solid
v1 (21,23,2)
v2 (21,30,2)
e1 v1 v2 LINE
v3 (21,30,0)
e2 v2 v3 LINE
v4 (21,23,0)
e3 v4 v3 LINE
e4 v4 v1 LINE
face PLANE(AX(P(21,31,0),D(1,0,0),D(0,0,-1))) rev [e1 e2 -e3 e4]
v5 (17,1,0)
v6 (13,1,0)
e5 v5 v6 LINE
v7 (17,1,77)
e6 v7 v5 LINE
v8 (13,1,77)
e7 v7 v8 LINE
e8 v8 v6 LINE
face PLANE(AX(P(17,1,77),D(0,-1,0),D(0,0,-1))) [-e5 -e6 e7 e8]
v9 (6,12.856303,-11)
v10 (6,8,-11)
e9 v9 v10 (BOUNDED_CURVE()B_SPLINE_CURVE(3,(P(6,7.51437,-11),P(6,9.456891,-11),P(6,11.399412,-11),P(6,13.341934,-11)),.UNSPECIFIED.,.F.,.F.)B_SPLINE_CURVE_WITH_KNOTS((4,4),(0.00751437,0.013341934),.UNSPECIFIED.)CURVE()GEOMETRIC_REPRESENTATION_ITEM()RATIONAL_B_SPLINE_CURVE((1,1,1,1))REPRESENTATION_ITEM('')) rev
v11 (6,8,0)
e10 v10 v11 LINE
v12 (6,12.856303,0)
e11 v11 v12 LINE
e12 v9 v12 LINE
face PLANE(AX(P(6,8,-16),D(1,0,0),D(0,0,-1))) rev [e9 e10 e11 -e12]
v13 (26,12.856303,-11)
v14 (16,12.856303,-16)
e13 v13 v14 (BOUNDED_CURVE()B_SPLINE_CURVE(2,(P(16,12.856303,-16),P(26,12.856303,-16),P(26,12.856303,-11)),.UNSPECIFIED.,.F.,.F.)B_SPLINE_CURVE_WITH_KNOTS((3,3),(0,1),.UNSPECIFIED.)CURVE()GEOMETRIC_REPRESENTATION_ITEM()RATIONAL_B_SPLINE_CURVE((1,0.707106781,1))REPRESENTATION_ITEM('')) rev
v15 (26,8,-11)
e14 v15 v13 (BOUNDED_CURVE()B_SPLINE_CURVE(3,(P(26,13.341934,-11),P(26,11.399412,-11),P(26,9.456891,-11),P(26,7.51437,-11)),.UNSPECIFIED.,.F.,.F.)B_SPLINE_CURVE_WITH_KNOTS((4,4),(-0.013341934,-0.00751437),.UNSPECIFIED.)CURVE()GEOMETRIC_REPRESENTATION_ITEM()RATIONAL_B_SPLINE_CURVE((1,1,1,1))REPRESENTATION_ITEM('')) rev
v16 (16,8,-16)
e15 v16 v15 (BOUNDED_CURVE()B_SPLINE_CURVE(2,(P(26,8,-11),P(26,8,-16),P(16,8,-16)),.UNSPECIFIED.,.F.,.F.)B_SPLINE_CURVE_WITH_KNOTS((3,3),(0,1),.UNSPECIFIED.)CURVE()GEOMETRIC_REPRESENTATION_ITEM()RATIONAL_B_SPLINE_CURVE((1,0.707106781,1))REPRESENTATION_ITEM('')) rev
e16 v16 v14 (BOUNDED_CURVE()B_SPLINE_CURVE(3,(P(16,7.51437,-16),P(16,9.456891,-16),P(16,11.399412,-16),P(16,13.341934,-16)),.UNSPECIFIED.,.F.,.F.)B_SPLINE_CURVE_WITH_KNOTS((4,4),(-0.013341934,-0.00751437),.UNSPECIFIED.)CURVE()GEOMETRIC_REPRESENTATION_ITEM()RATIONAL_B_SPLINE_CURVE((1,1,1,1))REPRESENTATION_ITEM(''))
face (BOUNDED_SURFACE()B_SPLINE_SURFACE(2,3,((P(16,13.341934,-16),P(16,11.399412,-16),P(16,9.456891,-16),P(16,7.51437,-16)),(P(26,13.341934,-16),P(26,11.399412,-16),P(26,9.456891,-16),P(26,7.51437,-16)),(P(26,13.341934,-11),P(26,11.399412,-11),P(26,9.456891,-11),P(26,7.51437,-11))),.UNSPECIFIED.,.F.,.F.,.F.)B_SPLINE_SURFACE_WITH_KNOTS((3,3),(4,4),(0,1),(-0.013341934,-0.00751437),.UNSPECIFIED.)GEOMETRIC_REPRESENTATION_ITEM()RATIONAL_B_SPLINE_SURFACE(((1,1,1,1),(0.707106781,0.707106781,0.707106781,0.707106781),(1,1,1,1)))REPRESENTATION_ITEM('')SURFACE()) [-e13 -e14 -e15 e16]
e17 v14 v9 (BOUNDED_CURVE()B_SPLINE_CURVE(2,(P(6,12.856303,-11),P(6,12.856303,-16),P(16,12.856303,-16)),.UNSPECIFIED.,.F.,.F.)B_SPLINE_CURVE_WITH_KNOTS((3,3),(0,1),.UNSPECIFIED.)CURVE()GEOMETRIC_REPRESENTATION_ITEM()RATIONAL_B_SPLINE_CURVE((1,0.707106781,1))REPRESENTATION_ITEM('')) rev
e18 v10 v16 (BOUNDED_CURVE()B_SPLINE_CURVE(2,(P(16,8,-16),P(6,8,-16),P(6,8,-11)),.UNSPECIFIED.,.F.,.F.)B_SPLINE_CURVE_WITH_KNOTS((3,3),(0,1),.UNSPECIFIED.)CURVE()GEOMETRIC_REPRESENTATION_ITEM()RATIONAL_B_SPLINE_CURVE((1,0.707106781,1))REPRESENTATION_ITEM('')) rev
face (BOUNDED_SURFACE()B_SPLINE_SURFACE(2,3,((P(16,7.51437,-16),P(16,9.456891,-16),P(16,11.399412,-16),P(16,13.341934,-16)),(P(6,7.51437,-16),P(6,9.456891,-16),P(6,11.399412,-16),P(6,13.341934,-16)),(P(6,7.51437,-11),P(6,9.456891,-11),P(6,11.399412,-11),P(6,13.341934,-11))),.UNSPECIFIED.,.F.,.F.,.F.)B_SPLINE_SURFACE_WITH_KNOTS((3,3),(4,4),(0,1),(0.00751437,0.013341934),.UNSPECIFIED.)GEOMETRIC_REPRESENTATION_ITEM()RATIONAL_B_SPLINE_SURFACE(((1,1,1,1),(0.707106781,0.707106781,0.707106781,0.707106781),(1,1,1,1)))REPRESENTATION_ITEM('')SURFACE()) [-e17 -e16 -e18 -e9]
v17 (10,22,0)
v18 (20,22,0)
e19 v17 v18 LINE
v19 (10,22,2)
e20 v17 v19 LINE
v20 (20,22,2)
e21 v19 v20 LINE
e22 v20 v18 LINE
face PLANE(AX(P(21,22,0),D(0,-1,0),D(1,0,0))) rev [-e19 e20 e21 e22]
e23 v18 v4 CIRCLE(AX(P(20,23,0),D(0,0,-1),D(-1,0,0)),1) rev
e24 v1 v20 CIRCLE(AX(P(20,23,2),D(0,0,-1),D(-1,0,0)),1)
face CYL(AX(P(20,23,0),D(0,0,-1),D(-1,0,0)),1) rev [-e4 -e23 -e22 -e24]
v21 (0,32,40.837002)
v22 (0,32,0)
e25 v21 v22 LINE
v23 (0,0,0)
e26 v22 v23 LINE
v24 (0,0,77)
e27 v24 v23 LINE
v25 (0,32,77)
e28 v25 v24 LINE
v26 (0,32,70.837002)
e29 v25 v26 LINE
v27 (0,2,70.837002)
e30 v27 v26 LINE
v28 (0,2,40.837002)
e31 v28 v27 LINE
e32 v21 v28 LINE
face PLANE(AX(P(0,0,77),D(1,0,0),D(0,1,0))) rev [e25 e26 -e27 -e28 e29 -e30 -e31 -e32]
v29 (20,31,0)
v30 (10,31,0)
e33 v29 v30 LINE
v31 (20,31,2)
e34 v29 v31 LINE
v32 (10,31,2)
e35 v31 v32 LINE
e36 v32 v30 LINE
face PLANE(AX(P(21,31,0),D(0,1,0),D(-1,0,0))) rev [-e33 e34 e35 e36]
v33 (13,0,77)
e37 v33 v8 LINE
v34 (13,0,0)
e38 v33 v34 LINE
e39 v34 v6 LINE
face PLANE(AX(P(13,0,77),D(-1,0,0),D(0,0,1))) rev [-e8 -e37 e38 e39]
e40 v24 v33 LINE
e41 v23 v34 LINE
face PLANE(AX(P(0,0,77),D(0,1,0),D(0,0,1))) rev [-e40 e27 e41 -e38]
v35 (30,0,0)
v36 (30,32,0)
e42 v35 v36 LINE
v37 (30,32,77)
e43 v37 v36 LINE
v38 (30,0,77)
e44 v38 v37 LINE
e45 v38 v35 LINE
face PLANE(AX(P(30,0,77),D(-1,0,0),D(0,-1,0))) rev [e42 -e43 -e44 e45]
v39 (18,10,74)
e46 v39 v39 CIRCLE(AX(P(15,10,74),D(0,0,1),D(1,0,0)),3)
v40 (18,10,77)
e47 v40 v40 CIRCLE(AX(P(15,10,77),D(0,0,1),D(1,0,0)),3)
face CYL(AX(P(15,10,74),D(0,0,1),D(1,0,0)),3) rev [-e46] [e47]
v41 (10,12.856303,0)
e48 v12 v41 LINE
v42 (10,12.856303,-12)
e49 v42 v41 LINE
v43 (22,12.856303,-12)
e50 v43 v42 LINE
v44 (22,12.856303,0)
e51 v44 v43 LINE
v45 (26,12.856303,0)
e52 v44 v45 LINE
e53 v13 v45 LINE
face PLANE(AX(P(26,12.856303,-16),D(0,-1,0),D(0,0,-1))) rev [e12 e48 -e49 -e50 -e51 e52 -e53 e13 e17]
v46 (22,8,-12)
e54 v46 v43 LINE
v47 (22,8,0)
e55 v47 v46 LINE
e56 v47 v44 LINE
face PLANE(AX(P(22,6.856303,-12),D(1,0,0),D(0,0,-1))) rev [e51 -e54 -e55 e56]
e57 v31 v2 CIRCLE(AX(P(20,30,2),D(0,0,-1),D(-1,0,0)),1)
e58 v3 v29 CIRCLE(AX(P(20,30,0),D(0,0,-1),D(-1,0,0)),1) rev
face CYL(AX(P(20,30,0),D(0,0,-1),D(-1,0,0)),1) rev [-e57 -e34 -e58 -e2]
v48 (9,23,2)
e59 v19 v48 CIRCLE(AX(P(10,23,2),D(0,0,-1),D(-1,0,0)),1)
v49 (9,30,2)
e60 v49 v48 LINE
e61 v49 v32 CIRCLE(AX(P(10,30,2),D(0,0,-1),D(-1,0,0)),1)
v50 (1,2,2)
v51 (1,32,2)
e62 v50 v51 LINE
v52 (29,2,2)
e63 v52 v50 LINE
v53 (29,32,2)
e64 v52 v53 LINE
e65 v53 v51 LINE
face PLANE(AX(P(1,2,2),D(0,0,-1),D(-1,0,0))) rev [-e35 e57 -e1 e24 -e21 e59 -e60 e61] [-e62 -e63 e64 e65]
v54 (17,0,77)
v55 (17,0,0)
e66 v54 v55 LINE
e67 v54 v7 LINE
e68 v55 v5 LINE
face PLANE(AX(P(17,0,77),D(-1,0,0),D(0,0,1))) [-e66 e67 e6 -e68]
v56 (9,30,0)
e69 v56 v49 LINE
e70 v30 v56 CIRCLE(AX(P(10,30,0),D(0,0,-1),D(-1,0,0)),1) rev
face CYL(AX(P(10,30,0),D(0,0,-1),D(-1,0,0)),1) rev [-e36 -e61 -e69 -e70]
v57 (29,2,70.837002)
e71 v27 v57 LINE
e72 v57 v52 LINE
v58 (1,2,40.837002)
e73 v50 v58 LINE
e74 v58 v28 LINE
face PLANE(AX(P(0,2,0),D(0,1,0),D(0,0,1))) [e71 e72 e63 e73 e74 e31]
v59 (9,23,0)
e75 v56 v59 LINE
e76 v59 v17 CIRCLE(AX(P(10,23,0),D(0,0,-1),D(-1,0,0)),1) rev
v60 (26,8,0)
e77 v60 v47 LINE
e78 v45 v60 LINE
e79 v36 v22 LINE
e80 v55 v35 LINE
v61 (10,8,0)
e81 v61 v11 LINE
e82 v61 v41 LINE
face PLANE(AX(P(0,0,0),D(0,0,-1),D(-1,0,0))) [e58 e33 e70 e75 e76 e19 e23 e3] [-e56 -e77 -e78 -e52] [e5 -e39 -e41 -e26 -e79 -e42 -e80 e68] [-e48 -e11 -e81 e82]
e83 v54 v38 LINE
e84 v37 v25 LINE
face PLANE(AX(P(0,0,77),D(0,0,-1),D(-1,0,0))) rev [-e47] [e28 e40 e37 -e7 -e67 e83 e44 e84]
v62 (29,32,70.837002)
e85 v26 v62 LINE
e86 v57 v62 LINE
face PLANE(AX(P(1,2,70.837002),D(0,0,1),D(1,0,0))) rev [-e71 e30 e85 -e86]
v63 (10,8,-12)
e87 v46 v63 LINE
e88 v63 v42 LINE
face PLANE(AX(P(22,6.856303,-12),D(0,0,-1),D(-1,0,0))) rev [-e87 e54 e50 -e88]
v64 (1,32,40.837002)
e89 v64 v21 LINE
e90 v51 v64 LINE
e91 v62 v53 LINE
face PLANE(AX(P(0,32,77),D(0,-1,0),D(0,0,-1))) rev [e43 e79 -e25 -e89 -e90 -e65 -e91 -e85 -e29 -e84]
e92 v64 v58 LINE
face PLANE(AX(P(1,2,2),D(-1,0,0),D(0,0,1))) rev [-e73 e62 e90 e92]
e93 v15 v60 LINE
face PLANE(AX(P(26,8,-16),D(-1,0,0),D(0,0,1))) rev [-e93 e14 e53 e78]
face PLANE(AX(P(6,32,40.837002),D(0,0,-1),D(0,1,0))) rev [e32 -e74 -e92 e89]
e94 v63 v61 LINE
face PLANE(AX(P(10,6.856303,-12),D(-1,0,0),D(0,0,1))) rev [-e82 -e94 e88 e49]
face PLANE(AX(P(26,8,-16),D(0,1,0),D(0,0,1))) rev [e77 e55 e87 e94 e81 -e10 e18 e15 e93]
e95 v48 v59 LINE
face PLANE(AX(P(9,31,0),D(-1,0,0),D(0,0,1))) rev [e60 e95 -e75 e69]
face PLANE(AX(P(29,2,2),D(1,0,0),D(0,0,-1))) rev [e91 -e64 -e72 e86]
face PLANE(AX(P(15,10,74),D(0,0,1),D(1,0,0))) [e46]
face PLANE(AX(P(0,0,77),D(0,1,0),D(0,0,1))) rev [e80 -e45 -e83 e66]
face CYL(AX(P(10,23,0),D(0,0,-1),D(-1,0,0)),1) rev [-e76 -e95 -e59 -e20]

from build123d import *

# Parameters (mm, degrees)
ESQUISSE1_W              = 30
ESQUISSE1_H              = 32
BOSS_EXTRU_2_DEPTH       = 77
ESQUISSE2_W              = 28
ESQUISSE2_H              = 68.8370016
ENL_V_MAT_EXTRU_4_DEPTH  = 30
ESQUISSE3_W              = 12
ESQUISSE3_H              = 9
ENL_V_MAT_EXTRU_5_DEPTH  = 87.884981441
ESQUISSE5_W              = 20
ESQUISSE5_H              = 4.856303455
BOSS_EXTRU_3_DEPTH       = 16
ESQUISSE6_W              = 12
ESQUISSE6_H              = 12
ENL_V_MAT_EXTRU_6_DEPTH  = 6
ESQUISSE7_W              = 30
ESQUISSE7_H              = 30
ENL_V_MAT_EXTRU_7_DEPTH  = 6
CONG_3_SIZE              = 5
CONG_3_SIZE_2            = 10
CONG_5_SIZE              = 5
CONG_5_SIZE_2            = 10
ESQUISSE10_W             = 4
ESQUISSE10_H             = 1
ENL_V_MAT_EXTRU_9_DEPTH  = 89.617154096
ESQUISSE16_R             = 3
ENL_V_MAT_EXTRU_11_DEPTH = 3
CONG_7_R                 = 1


with BuildPart() as part:
    # Esquisse1 → Boss.-Extru.2 (new body)
    with BuildSketch(Plane.XY):
        with Locations((15, 16)):
            Rectangle(ESQUISSE1_W, ESQUISSE1_H)
    extrude(amount=BOSS_EXTRU_2_DEPTH)

    # Esquisse2 → Enlèv. mat.-Extru.4 (cut)
    with BuildSketch(Plane(origin=(0, 32, 0), x_dir=(1, 0, 0), z_dir=(0, 1, 0))):
        with Locations((15, -36.4185008)):
            Rectangle(ESQUISSE2_W, ESQUISSE2_H)
    extrude(amount=-ENL_V_MAT_EXTRU_4_DEPTH, mode=Mode.SUBTRACT)

    # Esquisse3 → Enlèv. mat.-Extru.5 (cut, through all)
    with BuildSketch(Plane.XY.offset(2)):
        with Locations((15, 26.5)):
            Rectangle(ESQUISSE3_W, ESQUISSE3_H)
    extrude(amount=-ENL_V_MAT_EXTRU_5_DEPTH, mode=Mode.SUBTRACT)

    # Esquisse5 → Boss.-Extru.3 (add)
    with BuildSketch(Plane(origin=(0, 0, 0), x_dir=(-1, 0, 0), z_dir=(0, 0, -1))):
        with Locations((-16, 10.428151728)):
            Rectangle(ESQUISSE5_W, ESQUISSE5_H)
    extrude(amount=BOSS_EXTRU_3_DEPTH)

    # Esquisse6 → Enlèv. mat.-Extru.6 (cut)
    with BuildSketch(Plane(origin=(0, 12.856303455, 0), x_dir=(1, 0, 0), z_dir=(0, 1, 0))):
        with Locations((16, 6)):
            Rectangle(ESQUISSE6_W, ESQUISSE6_H)
    extrude(amount=-ENL_V_MAT_EXTRU_6_DEPTH, mode=Mode.SUBTRACT)

    # Esquisse7 → Enlèv. mat.-Extru.7 (cut)
    with BuildSketch(Plane.ZY):
        with Locations((55.8370016, 17)):
            Rectangle(ESQUISSE7_W, ESQUISSE7_H)
    extrude(amount=-ENL_V_MAT_EXTRU_7_DEPTH, mode=Mode.SUBTRACT)

    # Congé3
    # a fillet whose section is not a circle: 10, 5 mm, written as the material it takes off along each edge
    with BuildSketch(Plane(origin=(6, -17, -16), x_dir=(0, 0, 1), z_dir=(0, 1, 0))) as cong_3_piece_1:
        with BuildLine():
            Bezier((CONG_3_SIZE, 0), (0, 0), (0, CONG_3_SIZE_2), weights=[1, 0.707106781, 1])
            Line((0, CONG_3_SIZE_2), (0, 0))
            Line((0, 0), (CONG_3_SIZE, 0))
        make_face()
    extrude(amount=54.856303455, mode=Mode.SUBTRACT)

    # Congé5
    # a fillet whose section is not a circle: 10, 5 mm, written as the material it takes off along each edge
    with BuildSketch(Plane(origin=(26, 37.856303455, -16), x_dir=(0, 0, 1), z_dir=(0, -1, 0))) as cong_5_piece_1:
        with BuildLine():
            Bezier((CONG_5_SIZE, 0), (0, 0), (0, CONG_5_SIZE_2), weights=[1, 0.707106781, 1])
            Line((0, CONG_5_SIZE_2), (0, 0))
            Line((0, 0), (CONG_5_SIZE, 0))
        make_face()
    extrude(amount=54.856303455, mode=Mode.SUBTRACT)

    # Esquisse10 → Enlèv. mat.-Extru.9 (cut, through all)
    with BuildSketch(Plane(origin=(0, 0, 0), x_dir=(-1, 0, 0), z_dir=(0, 0, -1))):
        with Locations((-15, 0.5)):
            Rectangle(ESQUISSE10_W, ESQUISSE10_H)
    extrude(amount=-ENL_V_MAT_EXTRU_9_DEPTH, mode=Mode.SUBTRACT)

    # Esquisse16 → Enlèv. mat.-Extru.11 (cut)
    with BuildSketch(Plane.XY.offset(77)):
        with Locations((15, 10)):
            Circle(ESQUISSE16_R)
    extrude(amount=-ENL_V_MAT_EXTRU_11_DEPTH, mode=Mode.SUBTRACT)

    # Congé7
    cong_7_edges = [part.edges().sort_by_distance(p)[0] for p in [
        (21, 31, 1),
        (21, 22, 1),
        (9, 22, 1),
        (9, 31, 1),
    ]]
    fillet(cong_7_edges, radius=CONG_7_R)


solid = part.part
